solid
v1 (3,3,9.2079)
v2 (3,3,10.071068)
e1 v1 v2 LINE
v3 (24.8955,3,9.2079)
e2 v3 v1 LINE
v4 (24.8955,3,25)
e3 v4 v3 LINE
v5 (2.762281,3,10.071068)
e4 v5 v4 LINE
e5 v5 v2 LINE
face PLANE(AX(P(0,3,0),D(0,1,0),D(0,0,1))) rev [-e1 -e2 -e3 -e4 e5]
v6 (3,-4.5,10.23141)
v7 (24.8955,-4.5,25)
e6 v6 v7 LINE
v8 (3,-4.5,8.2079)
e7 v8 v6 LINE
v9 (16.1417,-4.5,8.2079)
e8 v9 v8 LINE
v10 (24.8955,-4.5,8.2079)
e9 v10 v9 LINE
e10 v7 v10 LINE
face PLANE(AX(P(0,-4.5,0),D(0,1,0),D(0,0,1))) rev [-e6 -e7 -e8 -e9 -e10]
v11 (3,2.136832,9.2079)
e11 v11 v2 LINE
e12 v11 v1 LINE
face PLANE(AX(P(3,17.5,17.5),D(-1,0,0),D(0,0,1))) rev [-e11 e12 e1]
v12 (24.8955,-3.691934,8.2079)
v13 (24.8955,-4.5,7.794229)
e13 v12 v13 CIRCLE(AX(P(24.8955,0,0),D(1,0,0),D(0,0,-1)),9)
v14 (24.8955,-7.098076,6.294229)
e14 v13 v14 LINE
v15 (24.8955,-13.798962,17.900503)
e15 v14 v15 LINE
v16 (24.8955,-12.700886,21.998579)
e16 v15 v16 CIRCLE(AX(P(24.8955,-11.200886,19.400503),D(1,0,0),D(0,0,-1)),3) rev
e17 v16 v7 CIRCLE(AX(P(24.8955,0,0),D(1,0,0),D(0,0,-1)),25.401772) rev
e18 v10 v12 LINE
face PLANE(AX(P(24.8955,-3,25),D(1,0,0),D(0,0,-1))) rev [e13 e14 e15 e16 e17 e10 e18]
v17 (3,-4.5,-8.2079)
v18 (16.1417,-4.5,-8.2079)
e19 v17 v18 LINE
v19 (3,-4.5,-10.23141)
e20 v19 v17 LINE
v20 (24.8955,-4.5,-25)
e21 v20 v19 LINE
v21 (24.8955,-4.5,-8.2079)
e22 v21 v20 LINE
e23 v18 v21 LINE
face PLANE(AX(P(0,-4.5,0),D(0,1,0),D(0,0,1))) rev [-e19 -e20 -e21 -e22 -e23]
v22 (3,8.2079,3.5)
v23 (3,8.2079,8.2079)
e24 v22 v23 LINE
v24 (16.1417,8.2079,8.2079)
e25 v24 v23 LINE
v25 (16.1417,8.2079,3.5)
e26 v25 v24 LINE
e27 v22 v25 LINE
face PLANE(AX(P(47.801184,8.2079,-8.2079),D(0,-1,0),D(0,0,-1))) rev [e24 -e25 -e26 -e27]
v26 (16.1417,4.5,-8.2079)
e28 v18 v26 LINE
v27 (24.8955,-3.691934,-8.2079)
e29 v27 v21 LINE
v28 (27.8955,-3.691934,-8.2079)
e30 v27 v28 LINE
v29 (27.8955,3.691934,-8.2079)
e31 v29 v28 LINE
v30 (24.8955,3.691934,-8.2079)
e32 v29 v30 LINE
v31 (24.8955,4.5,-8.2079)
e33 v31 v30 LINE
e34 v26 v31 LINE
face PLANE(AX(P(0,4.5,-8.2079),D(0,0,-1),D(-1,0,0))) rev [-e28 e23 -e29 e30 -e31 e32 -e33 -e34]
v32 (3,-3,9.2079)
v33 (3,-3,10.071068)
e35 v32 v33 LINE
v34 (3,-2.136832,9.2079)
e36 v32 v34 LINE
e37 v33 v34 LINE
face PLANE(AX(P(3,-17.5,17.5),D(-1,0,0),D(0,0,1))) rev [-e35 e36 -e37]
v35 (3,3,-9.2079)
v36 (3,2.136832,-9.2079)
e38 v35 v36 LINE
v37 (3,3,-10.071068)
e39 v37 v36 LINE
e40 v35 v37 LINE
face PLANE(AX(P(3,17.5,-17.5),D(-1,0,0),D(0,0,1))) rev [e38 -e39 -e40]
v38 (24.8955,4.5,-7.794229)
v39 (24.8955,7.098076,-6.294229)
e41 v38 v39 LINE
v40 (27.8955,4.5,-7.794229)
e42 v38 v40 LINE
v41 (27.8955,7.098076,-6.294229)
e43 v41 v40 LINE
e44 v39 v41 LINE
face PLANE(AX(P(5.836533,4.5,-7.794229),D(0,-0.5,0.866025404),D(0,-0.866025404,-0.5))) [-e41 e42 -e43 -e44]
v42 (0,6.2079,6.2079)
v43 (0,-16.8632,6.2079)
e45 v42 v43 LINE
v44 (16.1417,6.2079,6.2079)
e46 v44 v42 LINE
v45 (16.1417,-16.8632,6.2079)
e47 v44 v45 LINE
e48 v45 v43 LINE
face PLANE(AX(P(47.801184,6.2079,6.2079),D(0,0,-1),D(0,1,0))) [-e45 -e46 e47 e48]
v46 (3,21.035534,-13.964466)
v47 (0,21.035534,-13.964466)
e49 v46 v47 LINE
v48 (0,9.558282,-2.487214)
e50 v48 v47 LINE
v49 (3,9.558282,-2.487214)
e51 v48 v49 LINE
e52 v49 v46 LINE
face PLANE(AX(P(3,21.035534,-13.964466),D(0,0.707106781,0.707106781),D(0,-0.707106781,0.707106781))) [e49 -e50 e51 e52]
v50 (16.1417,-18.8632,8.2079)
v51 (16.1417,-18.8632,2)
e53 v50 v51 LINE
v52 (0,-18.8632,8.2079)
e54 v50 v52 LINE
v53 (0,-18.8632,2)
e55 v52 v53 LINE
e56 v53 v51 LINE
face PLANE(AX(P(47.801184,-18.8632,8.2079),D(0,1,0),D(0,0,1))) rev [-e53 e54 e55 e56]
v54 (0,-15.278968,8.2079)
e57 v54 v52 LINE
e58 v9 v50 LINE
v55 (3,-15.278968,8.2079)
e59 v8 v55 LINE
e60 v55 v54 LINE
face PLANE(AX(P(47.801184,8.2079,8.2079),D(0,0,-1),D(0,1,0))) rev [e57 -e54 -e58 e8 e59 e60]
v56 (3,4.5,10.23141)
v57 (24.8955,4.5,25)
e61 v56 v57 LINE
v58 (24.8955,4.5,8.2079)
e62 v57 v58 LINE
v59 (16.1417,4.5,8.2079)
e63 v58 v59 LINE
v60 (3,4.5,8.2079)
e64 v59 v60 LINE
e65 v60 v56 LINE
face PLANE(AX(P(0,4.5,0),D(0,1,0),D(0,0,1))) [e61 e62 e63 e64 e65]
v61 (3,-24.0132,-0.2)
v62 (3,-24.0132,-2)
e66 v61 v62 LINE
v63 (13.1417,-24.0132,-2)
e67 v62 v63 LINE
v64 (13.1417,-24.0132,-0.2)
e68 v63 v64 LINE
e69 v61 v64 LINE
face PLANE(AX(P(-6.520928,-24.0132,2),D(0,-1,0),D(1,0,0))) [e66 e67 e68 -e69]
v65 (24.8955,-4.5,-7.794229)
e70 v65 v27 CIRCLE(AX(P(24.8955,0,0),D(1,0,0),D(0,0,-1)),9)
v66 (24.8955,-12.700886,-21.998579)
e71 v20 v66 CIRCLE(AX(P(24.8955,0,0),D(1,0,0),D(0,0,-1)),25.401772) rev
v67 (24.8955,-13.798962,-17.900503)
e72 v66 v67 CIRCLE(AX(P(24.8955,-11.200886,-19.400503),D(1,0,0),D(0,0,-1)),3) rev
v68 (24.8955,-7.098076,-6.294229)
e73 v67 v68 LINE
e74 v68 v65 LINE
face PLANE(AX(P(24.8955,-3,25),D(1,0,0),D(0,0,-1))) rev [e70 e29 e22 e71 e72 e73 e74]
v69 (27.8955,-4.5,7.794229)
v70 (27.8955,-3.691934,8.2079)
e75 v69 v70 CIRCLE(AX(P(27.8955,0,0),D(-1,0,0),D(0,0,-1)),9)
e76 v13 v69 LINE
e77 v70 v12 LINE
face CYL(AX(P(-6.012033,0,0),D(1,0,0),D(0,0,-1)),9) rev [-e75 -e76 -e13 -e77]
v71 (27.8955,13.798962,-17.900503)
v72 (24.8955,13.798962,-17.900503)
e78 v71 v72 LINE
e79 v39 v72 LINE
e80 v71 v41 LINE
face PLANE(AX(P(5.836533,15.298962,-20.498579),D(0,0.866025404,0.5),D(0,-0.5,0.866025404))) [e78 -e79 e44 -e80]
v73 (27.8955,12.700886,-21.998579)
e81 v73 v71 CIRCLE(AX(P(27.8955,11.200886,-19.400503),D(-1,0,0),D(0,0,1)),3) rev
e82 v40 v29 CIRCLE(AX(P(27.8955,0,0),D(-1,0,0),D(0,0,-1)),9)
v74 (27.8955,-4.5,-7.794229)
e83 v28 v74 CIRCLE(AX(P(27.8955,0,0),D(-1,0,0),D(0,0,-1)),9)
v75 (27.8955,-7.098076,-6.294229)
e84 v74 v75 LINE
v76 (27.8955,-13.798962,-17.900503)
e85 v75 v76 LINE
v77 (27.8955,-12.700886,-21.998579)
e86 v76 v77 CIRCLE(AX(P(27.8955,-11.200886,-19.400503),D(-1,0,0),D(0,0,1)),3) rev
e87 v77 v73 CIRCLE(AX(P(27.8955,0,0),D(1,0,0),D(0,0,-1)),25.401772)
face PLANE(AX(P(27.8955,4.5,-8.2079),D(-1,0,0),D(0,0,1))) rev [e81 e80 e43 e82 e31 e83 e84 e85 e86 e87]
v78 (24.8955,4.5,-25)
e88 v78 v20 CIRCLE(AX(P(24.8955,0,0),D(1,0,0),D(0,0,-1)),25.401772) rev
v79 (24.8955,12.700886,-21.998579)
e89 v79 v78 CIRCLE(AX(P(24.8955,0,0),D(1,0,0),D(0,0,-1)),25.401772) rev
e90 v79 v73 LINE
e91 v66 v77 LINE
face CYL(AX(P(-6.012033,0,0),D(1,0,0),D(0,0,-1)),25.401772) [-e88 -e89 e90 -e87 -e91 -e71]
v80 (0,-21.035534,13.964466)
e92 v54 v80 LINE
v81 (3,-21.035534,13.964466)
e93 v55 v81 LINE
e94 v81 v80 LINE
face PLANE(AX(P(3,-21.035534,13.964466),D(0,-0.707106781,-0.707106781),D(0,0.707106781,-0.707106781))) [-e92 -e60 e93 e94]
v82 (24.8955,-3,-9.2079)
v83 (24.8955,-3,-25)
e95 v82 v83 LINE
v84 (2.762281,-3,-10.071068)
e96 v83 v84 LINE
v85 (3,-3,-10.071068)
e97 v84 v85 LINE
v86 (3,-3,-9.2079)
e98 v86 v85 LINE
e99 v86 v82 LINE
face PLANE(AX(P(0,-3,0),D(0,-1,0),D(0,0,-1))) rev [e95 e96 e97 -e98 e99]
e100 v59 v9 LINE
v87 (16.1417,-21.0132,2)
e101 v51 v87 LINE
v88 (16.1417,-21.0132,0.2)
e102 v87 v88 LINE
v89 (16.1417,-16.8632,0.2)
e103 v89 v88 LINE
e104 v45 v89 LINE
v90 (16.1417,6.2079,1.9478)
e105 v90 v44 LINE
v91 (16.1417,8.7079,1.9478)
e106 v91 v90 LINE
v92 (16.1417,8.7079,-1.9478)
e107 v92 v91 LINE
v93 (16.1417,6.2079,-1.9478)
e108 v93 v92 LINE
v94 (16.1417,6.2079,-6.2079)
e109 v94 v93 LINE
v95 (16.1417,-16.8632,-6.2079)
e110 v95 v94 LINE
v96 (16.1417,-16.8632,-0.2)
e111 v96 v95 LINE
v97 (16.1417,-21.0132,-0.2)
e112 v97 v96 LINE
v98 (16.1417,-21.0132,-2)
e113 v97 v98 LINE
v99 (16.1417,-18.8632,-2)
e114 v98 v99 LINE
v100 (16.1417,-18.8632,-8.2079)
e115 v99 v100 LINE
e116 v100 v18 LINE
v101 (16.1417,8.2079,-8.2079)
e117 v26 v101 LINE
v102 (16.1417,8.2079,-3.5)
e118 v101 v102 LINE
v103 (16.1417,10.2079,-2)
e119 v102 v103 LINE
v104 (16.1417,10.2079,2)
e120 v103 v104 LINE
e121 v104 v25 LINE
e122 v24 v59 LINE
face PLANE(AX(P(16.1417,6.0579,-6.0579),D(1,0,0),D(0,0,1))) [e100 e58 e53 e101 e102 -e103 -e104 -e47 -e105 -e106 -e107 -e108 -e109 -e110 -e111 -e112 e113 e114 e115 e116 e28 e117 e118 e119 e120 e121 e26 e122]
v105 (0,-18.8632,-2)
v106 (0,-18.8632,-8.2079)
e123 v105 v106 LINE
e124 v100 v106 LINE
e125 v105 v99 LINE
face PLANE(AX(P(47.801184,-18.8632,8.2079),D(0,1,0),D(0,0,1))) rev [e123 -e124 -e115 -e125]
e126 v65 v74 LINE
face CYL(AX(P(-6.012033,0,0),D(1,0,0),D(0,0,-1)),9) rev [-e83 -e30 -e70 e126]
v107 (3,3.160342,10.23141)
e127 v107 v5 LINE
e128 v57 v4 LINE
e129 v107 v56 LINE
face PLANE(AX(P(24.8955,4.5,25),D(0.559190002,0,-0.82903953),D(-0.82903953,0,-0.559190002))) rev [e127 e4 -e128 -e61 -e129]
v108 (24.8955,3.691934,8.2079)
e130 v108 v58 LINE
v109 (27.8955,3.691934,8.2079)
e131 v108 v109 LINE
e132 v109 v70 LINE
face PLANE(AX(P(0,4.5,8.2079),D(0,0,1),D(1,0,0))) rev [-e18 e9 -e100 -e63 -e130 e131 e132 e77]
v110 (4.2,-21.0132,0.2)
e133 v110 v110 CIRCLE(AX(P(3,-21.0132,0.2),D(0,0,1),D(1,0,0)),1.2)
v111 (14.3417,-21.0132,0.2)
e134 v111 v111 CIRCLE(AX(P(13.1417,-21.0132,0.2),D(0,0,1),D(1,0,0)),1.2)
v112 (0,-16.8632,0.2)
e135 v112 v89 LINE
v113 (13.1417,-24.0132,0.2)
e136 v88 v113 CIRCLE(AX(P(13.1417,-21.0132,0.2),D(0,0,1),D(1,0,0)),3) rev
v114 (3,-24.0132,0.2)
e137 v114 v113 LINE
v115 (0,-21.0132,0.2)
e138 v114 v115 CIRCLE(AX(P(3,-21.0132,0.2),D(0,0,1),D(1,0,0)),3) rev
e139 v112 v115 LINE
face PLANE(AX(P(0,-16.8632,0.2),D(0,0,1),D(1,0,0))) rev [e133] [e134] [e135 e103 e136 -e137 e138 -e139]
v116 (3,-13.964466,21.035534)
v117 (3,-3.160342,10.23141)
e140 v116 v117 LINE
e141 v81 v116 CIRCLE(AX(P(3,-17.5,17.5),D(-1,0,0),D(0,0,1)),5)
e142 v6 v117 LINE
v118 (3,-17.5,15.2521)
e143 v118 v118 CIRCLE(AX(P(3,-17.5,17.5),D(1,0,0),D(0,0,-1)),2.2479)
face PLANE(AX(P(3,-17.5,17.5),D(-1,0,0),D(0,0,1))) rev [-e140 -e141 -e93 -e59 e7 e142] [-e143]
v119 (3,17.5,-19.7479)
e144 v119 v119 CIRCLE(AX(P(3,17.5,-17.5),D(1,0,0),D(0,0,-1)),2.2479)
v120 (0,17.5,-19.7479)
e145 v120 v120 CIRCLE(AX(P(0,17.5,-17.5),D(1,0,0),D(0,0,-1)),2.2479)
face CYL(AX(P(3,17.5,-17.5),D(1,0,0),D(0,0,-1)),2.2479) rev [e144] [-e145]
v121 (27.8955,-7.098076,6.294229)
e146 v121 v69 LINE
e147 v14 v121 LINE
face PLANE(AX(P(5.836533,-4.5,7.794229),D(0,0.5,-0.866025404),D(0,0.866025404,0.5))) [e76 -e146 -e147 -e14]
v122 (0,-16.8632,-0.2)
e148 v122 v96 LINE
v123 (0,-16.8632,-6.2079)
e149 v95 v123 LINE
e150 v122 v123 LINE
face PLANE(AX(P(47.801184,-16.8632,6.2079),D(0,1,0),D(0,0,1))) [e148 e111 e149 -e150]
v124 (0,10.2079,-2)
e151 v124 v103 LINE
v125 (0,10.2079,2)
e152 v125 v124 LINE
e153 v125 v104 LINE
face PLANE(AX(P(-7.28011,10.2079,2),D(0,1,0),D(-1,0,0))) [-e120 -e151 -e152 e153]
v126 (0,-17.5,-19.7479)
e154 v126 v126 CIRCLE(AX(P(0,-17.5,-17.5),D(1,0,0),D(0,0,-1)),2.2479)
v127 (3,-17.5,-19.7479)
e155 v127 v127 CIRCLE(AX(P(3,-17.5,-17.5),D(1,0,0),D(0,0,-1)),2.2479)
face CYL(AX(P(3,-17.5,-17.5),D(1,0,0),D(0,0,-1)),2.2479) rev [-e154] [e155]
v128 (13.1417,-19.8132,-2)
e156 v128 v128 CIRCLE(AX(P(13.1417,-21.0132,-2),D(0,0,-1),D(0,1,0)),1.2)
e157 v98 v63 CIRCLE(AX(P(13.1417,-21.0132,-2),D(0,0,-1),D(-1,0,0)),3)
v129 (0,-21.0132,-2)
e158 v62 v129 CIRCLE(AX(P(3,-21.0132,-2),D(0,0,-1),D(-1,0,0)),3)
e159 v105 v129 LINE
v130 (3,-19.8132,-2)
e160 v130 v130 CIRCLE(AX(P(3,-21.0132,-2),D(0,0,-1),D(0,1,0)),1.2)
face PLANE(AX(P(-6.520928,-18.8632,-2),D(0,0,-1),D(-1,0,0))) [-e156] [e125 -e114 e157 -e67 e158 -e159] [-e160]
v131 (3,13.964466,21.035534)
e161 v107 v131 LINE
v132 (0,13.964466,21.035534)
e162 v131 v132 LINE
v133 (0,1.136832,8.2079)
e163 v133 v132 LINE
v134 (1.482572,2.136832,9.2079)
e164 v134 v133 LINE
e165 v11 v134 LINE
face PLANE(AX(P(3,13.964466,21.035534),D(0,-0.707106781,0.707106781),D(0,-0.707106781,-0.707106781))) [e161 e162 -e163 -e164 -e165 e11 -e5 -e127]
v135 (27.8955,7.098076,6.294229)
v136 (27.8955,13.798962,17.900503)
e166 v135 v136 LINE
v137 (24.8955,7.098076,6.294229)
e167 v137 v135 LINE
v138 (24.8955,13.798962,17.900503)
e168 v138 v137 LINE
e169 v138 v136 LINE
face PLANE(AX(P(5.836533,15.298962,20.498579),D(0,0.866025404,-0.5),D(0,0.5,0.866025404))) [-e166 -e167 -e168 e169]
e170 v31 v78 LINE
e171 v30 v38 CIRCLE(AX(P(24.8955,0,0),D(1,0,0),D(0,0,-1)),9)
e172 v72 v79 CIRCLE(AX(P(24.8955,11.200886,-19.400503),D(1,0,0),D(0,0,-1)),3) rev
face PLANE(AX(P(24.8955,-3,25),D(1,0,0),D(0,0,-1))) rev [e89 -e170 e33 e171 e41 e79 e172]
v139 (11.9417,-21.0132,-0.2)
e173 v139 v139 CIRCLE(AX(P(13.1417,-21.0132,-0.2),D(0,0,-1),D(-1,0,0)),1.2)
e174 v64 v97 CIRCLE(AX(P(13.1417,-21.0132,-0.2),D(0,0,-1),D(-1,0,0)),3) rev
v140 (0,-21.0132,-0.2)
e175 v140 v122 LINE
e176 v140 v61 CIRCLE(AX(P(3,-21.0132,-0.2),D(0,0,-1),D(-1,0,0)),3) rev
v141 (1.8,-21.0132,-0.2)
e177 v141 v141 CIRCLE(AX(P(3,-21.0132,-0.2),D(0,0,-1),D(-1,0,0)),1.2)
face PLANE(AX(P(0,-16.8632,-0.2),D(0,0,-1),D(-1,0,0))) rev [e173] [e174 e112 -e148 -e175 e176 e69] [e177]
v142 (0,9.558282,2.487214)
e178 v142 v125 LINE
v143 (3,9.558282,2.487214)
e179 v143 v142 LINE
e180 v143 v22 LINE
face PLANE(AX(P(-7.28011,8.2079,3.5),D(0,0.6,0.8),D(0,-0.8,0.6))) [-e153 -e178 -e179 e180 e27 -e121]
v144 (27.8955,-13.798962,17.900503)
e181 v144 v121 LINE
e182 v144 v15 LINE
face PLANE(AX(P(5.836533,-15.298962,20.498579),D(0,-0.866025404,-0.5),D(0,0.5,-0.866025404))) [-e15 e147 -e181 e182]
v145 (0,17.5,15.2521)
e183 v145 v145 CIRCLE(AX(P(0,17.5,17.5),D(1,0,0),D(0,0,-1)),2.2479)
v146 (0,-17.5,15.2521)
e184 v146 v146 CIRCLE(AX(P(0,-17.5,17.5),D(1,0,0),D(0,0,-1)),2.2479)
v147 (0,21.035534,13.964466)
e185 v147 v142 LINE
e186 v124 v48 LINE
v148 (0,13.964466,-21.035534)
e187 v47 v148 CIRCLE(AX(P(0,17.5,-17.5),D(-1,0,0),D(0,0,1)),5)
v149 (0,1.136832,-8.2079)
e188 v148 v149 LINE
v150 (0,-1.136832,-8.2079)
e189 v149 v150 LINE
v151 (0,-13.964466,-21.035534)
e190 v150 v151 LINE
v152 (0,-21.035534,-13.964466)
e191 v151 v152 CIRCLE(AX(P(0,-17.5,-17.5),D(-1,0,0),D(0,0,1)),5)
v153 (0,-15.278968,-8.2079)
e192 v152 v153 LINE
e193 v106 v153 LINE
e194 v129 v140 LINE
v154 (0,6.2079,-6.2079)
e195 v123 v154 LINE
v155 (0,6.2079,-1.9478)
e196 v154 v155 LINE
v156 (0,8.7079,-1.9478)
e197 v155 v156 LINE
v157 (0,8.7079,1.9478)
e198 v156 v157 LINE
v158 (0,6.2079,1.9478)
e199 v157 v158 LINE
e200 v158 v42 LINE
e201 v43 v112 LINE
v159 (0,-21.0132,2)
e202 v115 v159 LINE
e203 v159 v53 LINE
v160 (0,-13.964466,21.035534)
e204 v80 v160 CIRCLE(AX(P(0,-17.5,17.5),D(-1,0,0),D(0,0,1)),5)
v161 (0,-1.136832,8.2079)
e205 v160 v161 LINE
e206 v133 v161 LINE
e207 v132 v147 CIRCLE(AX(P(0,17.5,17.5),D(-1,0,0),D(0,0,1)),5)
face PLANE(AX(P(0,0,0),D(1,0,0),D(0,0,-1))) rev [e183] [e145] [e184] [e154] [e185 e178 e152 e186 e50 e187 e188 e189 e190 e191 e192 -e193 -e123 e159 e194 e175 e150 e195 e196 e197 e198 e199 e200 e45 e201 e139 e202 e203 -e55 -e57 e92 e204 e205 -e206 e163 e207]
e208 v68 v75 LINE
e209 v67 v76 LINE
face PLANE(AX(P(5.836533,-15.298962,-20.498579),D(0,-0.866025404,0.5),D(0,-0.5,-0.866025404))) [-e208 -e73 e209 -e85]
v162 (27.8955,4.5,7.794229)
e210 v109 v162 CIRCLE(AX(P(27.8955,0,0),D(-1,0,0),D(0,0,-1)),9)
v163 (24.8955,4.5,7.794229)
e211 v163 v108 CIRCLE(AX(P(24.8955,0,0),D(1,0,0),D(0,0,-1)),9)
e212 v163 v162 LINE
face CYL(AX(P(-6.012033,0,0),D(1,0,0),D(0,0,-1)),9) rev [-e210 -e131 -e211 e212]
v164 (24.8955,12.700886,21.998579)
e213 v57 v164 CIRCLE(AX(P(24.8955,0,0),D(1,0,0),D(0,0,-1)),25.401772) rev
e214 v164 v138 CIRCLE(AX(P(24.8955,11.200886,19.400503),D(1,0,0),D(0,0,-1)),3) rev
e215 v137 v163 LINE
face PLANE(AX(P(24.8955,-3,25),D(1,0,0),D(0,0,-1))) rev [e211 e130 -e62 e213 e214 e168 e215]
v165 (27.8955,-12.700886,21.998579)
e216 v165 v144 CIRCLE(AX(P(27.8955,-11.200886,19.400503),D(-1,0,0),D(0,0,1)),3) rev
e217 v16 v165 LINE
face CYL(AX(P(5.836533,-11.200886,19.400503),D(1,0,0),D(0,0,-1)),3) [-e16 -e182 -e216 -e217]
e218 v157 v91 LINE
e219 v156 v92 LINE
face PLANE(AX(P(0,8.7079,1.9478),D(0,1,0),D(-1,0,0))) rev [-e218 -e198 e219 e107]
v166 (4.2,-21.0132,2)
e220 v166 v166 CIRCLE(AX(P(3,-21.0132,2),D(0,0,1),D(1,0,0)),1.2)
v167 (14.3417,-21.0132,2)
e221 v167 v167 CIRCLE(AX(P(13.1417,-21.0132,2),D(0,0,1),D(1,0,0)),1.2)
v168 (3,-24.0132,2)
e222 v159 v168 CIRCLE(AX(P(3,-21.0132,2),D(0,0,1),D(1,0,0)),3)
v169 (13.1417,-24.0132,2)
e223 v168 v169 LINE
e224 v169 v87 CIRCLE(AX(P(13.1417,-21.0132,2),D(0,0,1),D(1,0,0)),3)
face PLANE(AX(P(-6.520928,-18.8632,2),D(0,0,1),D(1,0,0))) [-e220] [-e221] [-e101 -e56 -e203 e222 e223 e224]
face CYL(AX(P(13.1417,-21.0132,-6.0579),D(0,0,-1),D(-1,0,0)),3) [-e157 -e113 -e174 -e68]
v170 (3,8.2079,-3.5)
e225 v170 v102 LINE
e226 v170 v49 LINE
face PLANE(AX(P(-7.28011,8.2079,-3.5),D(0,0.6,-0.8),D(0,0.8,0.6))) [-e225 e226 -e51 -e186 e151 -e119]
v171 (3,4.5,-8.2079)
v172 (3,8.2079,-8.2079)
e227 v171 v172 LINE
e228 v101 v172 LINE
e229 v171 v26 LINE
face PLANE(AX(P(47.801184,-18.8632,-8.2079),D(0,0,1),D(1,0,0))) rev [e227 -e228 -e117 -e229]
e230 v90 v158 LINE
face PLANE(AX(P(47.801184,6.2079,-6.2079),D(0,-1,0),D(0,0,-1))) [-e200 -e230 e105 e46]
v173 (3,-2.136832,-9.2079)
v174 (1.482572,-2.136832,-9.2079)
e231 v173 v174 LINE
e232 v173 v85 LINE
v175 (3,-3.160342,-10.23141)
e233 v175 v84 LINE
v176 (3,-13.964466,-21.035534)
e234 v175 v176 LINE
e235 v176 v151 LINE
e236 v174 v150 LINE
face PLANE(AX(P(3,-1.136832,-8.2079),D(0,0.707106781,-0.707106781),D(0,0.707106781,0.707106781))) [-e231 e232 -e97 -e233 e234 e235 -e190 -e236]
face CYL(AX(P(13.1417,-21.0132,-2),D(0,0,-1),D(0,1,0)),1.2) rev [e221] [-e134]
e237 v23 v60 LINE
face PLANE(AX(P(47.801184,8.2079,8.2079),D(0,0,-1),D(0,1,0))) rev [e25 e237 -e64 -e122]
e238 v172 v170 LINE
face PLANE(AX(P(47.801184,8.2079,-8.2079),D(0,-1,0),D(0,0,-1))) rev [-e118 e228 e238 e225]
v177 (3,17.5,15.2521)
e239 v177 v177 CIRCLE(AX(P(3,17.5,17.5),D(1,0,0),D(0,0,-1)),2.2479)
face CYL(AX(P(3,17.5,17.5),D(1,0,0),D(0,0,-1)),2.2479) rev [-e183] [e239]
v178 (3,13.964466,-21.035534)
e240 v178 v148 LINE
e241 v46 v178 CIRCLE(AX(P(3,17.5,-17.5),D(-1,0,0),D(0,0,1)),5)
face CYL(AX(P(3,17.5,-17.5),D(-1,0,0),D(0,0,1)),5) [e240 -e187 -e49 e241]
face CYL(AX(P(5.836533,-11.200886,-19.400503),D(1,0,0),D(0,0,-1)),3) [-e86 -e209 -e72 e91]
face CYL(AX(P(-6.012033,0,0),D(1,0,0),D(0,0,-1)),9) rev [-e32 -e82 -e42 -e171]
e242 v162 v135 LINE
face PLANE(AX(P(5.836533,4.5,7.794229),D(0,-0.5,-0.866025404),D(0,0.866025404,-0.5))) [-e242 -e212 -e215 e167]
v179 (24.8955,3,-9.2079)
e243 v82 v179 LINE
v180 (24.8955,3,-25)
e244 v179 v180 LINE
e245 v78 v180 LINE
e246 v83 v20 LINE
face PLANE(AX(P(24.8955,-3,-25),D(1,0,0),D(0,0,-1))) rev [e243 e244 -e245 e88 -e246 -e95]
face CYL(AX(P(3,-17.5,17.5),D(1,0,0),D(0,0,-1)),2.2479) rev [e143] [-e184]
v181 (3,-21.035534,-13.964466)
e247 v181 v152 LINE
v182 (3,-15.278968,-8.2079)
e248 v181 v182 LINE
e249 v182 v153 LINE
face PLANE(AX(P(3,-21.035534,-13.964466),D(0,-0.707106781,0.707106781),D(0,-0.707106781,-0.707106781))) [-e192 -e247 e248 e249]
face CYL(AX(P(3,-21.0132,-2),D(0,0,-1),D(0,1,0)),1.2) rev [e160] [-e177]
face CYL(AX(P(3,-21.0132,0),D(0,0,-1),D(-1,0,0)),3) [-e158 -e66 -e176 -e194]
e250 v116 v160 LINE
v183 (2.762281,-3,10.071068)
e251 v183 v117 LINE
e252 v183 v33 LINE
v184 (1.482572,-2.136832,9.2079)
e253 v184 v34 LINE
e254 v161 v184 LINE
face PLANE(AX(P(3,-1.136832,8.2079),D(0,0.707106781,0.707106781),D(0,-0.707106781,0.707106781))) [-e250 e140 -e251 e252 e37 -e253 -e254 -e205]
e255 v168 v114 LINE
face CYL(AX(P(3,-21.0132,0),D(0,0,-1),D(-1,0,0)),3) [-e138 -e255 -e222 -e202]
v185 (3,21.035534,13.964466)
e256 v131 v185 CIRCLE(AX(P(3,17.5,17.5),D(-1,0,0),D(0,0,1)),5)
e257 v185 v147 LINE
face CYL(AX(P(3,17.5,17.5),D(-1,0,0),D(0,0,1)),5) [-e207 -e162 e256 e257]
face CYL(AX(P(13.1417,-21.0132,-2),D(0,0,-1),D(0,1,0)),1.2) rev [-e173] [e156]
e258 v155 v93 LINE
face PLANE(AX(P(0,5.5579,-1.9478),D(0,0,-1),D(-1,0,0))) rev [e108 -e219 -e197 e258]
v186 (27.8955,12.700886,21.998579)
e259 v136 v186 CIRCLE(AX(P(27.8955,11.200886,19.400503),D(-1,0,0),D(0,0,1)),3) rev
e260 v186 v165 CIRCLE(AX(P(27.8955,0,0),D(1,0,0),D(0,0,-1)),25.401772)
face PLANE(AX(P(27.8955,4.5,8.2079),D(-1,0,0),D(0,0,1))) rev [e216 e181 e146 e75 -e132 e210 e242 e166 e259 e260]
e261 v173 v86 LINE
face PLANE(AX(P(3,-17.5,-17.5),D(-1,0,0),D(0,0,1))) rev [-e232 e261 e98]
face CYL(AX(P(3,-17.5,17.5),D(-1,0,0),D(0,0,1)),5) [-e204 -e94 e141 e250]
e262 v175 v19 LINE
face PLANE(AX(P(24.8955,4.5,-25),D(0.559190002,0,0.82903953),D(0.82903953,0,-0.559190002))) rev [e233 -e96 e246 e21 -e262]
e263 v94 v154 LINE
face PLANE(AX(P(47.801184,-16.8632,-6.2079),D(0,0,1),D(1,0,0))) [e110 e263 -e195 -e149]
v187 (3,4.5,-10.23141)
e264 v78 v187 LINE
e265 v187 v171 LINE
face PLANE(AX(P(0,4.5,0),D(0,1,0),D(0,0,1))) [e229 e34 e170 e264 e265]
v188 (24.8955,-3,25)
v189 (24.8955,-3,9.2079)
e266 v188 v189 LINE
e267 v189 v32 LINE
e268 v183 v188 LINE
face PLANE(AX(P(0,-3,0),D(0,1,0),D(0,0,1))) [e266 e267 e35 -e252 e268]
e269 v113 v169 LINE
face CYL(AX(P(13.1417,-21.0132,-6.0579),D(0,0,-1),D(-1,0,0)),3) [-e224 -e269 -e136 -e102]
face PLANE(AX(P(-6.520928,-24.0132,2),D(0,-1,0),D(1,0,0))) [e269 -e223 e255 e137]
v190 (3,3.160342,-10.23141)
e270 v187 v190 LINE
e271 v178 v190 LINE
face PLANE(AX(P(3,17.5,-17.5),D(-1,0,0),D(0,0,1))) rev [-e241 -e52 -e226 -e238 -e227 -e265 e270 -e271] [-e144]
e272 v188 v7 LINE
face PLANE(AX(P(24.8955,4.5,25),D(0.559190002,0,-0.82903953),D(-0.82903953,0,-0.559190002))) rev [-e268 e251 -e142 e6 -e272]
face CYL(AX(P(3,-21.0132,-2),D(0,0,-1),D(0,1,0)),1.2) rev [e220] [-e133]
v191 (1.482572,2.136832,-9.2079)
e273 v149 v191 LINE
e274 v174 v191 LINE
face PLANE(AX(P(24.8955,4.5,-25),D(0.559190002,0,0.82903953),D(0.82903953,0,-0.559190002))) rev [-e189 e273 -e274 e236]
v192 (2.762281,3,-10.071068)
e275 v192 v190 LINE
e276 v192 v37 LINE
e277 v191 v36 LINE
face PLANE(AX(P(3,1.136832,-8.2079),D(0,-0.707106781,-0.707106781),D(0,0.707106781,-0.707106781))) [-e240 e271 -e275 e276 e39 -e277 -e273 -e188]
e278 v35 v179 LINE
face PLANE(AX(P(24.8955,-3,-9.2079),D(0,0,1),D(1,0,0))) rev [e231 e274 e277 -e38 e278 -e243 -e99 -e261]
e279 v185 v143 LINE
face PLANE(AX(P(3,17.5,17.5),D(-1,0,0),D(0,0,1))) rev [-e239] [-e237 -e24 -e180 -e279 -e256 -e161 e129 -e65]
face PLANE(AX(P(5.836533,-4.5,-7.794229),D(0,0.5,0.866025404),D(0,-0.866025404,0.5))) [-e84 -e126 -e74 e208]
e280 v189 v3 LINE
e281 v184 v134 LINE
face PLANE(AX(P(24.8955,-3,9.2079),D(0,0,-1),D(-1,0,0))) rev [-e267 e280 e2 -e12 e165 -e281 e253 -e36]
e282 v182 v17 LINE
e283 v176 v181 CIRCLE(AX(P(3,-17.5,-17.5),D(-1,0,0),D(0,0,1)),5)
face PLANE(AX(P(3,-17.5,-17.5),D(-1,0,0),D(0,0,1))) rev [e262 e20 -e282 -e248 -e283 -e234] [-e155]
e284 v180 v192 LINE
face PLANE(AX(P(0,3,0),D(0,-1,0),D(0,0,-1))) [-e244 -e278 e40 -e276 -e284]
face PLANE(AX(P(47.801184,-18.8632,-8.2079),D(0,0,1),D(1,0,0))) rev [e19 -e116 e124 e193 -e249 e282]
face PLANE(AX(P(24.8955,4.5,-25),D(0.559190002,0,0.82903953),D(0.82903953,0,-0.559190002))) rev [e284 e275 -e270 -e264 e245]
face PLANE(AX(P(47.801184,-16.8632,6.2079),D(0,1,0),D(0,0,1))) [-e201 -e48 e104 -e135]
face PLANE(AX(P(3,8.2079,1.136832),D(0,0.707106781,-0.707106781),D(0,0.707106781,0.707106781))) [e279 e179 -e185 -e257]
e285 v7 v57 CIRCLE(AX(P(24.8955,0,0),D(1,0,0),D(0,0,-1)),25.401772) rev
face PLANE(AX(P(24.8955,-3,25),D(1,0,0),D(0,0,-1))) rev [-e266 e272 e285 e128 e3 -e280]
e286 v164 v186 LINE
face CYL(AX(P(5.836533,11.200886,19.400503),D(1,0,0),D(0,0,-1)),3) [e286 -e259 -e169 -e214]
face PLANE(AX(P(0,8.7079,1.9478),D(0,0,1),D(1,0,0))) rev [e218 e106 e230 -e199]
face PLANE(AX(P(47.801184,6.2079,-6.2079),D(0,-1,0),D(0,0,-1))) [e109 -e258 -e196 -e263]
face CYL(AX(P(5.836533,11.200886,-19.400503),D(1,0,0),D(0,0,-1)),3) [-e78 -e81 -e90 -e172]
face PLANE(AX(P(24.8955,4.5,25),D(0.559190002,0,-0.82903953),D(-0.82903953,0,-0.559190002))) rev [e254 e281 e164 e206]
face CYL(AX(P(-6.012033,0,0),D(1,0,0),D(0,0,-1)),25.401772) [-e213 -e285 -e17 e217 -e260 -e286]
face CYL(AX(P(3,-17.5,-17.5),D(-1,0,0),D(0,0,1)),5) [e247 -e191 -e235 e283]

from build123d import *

# Parameters (mm, degrees)
MICRO_START                                  = -46.670460781
MICRO_SERVO_MOUNT_BASE_PART_CAMERA_TUR_DEPTH = 16.1417
MICRO_START_2                                = 12.849763649
MICRO_SERVO_MOUNT_BASE_PART_CAMERA_3_O_R     = 1.2
MICRO_SERVO_MOUNT_BASE_PART_CAMERA_3_DEPTH   = 16.4158
BOSS_EXTRUDE1_DEPTH                          = 4.5
CUT_EXTRUDE1_DEPTH                           = 3
BOSS_EXTRUDE2_DEPTH                          = 3
BOSS_EXTRUDE3_DEPTH                          = 3
FILLET1_R                                    = 3
BOSS_EXTRUDE4_DEPTH                          = 3
CUT_EXTRUDE2_DEPTH                           = 45.721836893
F_8_CLEARANCE_HOLE1_D                        = 4.4958


with BuildPart() as part:
    # Micro Servo Mount Base Part - Camera Tur: read off the stored shape, not the designer's step
    # Micro Servo Mount Base Part - Camera 2 → Micro Servo Mount Base Part - Camera Tur (new body)
    with BuildSketch(Plane.YZ.offset(MICRO_START)):
        Polygon((-18.758887412, 21.257663649), (-11.608887412, 21.257663649), (-11.608887412, 27.265563649), (11.462212588, 27.265563649), (11.462212588, 23.005463649), (13.962212588, 23.005463649), (13.962212588, 19.109863649), (11.462212588, 19.109863649), (11.462212588, 14.849763649), (-11.608887412, 14.849763649), (-11.608887412, 20.857663649), (-18.758887412, 20.857663649), (-18.758887412, 19.057663649), (-13.608887412, 19.057663649), (-13.608887412, 12.849763649), (13.462212588, 12.849763649), (13.462212588, 17.557663649), (15.462212588, 19.057663649), (15.462212588, 23.057663649), (13.462212588, 24.557663649), (13.462212588, 29.265563649), (-13.608887412, 29.265563649), (-13.608887412, 23.057663649), (-18.758887412, 23.057663649), align=None)
    extrude(amount=MICRO_SERVO_MOUNT_BASE_PART_CAMERA_TUR_DEPTH)

    # Micro Servo Mount Base Part - Camera 3 o → Micro Servo Mount Base Part - Camera 3 (cut)
    with BuildSketch(Plane.XY.offset(MICRO_START_2)):
        with BuildLine():
            Line((-46.670460781, -18.758887412), (-43.670460781, -18.758887412))
            ThreePointArc((-43.670460781, -18.758887412), (-45.791781124, -17.880207755), (-46.670460781, -15.758887412))
            Line((-46.670460781, -15.758887412), (-46.670460781, -18.758887412))
        make_face()
        with BuildLine():
            ThreePointArc((-30.528760781, -15.758887412), (-31.407440438, -17.880207755), (-33.528760781, -18.758887412))
            Line((-33.528760781, -18.758887412), (-30.528760781, -18.758887412))
            Line((-30.528760781, -18.758887412), (-30.528760781, -15.758887412))
        make_face()
        with Locations((-43.670460781, -15.758887412)):
            Circle(MICRO_SERVO_MOUNT_BASE_PART_CAMERA_3_O_R)
        with Locations((-33.528760781, -15.758887412)):
            Circle(MICRO_SERVO_MOUNT_BASE_PART_CAMERA_3_O_R)
    extrude(amount=MICRO_SERVO_MOUNT_BASE_PART_CAMERA_3_DEPTH, mode=Mode.SUBTRACT)


with BuildPart() as part_1:
    # Micro Servo Mount Base Part - Camera 4: read off the stored shape, not the designer's step
    # Micro Servo Mount Base Part - Camera 4: moved
    add(part.part.moved(Location((46.6704608, -5.2543126, -21.0576636))))

    # Sketch7 → Boss-Extrude1 (add, symmetric)
    with BuildSketch(Plane(origin=(0, 0, 0), x_dir=(1, 0, 0), z_dir=(0, 1, 0))):
        Polygon((0, 8.2079), (27.8955, 8.2079), (27.8955, 25), (24.8955, 25), align=None)
        Polygon((24.8955, -25), (0, -8.2079), (27.8955, -8.2079), (27.8955, -25), align=None)
    extrude(amount=BOSS_EXTRUDE1_DEPTH, both=True)

    # Sketch9 → Cut-Extrude1 (cut, symmetric)
    with BuildSketch(Plane(origin=(0, 0, 0), x_dir=(1, 0, 0), z_dir=(0, 1, 0))):
        Polygon((1.482572162, -9.2079), (24.8955, -25), (24.8955, -9.2079), align=None)
        Polygon((24.8955, 9.2079), (1.482572162, 9.2079), (24.8955, 25), align=None)
    extrude(amount=CUT_EXTRUDE1_DEPTH, both=True, mode=Mode.SUBTRACT)

    # Sketch10 → Boss-Extrude2 (add)
    with BuildSketch(Plane(origin=(27.8955, 0, 0), x_dir=(0, 0, -1), z_dir=(1, 0, 0))):
        with BuildLine():
            Line((-21.9985795, 12.700885796), (-7.794228634, 4.5))
            ThreePointArc((-7.794228634, 4.5), (-9, 0), (-7.794228634, -4.5))
            Line((-7.794228634, -4.5), (-21.9985795, -12.700885796))
            ThreePointArc((-21.9985795, -12.700885796), (-25.401771592, 0), (-21.9985795, 12.700885796))
        make_face()
        with BuildLine():
            Line((7.794228634, 4.5), (21.9985795, 12.700885796))
            ThreePointArc((21.9985795, 12.700885796), (25.401771592, 0), (21.9985795, -12.700885796))
            Line((21.9985795, -12.700885796), (7.794228634, -4.5))
            ThreePointArc((7.794228634, -4.5), (9, 0), (7.794228634, 4.5))
        make_face()
    extrude(amount=-BOSS_EXTRUDE2_DEPTH)

    # Sketch11 → Boss-Extrude3 (add)
    with BuildSketch(Plane(origin=(27.8955, 0, 0), x_dir=(0, 0, -1), z_dir=(1, 0, 0))):
        Polygon((-21.9985795, 12.700885796), (-7.794228634, 4.5), (-6.294228634, 7.098076211), (-20.4985795, 15.298962007), align=None)
        Polygon((7.794228634, 4.5), (6.294228634, 7.098076211), (20.4985795, 15.298962007), (21.9985795, 12.700885796), align=None)
        Polygon((21.9985795, -12.700885796), (7.794228634, -4.5), (6.294228634, -7.098076211), (20.4985795, -15.298962007), align=None)
        Polygon((-7.794228634, -4.5), (-6.294228634, -7.098076211), (-20.4985795, -15.298962007), (-21.9985795, -12.700885796), align=None)
    extrude(amount=-BOSS_EXTRUDE3_DEPTH)

    # Fillet1
    fillet1_edges = [part_1.edges().sort_by_distance(p)[0] for p in [
        (26.3955, -15.298962007, -20.4985795),
        (26.3955, -15.298962007, 20.4985795),
        (26.3955, 15.298962007, -20.4985795),
        (26.3955, 15.298962007, 20.4985795),
    ]]
    fillet(fillet1_edges, radius=FILLET1_R - 0.0001)  # a hair under: the kernel refuses the full size

    # Sketch13 → Boss-Extrude4 (add)
    with BuildSketch(Plane.ZY):
        with BuildLine():
            Line((13.964466094, -21.035533906), (8.2079, -15.278967812))
            Line((8.2079, -15.278967812), (8.2079, -1.136832188))
            Line((8.2079, -1.136832188), (21.035533906, -13.964466094))
            ThreePointArc((21.035533906, -13.964466094), (21.035533906, -21.035533906), (13.964466094, -21.035533906))
        make_face()
        with BuildLine():
            Line((-13.964466094, 21.035533906), (-1.136832188, 8.2079))
            Line((-1.136832188, 8.2079), (-8.2079, 8.2079))
            Line((-8.2079, 8.2079), (-8.2079, 1.136832188))
            Line((-8.2079, 1.136832188), (-21.035533906, 13.964466094))
            ThreePointArc((-21.035533906, 13.964466094), (-21.035533906, 21.035533906), (-13.964466094, 21.035533906))
        make_face()
        with BuildLine():
            Line((1.136832188, 8.2079), (13.964466094, 21.035533906))
            ThreePointArc((13.964466094, 21.035533906), (21.035533906, 21.035533906), (21.035533906, 13.964466094))
            Line((21.035533906, 13.964466094), (8.2079, 1.136832188))
            Line((8.2079, 1.136832188), (8.2079, 8.2079))
            Line((8.2079, 8.2079), (1.136832188, 8.2079))
        make_face()
        with BuildLine():
            Line((-8.2079, -1.136832188), (-21.035533906, -13.964466094))
            ThreePointArc((-21.035533906, -13.964466094), (-21.035533906, -21.035533906), (-13.964466094, -21.035533906))
            Line((-13.964466094, -21.035533906), (-8.2079, -15.278967812))
            Line((-8.2079, -15.278967812), (-8.2079, -1.136832188))
        make_face()
    extrude(amount=-BOSS_EXTRUDE4_DEPTH)

    # Sketch14 → Cut-Extrude2 (cut, through all)
    with BuildSketch(Plane.ZY):
        Polygon((-1.9478, 6.2079), (-6.2079, 6.2079), (-6.2079, -16.8632), (6.2079, -16.8632), (6.2079, 6.2079), (1.9478, 6.2079), (1.9478, 8.7079), (-1.9478, 8.7079), align=None)
    extrude(amount=-CUT_EXTRUDE2_DEPTH, mode=Mode.SUBTRACT)

    # #8 Clearance Hole1 (through all)
    with Locations(Plane(origin=(3, 0, 0), x_dir=(0, 0, -1), z_dir=(1, 0, 0))):
        with Locations((-17.5, 17.5), (17.5, 17.5), (17.5, -17.5), (-17.5, -17.5)):
            Hole(F_8_CLEARANCE_HOLE1_D / 2)


solid = part_1.part
